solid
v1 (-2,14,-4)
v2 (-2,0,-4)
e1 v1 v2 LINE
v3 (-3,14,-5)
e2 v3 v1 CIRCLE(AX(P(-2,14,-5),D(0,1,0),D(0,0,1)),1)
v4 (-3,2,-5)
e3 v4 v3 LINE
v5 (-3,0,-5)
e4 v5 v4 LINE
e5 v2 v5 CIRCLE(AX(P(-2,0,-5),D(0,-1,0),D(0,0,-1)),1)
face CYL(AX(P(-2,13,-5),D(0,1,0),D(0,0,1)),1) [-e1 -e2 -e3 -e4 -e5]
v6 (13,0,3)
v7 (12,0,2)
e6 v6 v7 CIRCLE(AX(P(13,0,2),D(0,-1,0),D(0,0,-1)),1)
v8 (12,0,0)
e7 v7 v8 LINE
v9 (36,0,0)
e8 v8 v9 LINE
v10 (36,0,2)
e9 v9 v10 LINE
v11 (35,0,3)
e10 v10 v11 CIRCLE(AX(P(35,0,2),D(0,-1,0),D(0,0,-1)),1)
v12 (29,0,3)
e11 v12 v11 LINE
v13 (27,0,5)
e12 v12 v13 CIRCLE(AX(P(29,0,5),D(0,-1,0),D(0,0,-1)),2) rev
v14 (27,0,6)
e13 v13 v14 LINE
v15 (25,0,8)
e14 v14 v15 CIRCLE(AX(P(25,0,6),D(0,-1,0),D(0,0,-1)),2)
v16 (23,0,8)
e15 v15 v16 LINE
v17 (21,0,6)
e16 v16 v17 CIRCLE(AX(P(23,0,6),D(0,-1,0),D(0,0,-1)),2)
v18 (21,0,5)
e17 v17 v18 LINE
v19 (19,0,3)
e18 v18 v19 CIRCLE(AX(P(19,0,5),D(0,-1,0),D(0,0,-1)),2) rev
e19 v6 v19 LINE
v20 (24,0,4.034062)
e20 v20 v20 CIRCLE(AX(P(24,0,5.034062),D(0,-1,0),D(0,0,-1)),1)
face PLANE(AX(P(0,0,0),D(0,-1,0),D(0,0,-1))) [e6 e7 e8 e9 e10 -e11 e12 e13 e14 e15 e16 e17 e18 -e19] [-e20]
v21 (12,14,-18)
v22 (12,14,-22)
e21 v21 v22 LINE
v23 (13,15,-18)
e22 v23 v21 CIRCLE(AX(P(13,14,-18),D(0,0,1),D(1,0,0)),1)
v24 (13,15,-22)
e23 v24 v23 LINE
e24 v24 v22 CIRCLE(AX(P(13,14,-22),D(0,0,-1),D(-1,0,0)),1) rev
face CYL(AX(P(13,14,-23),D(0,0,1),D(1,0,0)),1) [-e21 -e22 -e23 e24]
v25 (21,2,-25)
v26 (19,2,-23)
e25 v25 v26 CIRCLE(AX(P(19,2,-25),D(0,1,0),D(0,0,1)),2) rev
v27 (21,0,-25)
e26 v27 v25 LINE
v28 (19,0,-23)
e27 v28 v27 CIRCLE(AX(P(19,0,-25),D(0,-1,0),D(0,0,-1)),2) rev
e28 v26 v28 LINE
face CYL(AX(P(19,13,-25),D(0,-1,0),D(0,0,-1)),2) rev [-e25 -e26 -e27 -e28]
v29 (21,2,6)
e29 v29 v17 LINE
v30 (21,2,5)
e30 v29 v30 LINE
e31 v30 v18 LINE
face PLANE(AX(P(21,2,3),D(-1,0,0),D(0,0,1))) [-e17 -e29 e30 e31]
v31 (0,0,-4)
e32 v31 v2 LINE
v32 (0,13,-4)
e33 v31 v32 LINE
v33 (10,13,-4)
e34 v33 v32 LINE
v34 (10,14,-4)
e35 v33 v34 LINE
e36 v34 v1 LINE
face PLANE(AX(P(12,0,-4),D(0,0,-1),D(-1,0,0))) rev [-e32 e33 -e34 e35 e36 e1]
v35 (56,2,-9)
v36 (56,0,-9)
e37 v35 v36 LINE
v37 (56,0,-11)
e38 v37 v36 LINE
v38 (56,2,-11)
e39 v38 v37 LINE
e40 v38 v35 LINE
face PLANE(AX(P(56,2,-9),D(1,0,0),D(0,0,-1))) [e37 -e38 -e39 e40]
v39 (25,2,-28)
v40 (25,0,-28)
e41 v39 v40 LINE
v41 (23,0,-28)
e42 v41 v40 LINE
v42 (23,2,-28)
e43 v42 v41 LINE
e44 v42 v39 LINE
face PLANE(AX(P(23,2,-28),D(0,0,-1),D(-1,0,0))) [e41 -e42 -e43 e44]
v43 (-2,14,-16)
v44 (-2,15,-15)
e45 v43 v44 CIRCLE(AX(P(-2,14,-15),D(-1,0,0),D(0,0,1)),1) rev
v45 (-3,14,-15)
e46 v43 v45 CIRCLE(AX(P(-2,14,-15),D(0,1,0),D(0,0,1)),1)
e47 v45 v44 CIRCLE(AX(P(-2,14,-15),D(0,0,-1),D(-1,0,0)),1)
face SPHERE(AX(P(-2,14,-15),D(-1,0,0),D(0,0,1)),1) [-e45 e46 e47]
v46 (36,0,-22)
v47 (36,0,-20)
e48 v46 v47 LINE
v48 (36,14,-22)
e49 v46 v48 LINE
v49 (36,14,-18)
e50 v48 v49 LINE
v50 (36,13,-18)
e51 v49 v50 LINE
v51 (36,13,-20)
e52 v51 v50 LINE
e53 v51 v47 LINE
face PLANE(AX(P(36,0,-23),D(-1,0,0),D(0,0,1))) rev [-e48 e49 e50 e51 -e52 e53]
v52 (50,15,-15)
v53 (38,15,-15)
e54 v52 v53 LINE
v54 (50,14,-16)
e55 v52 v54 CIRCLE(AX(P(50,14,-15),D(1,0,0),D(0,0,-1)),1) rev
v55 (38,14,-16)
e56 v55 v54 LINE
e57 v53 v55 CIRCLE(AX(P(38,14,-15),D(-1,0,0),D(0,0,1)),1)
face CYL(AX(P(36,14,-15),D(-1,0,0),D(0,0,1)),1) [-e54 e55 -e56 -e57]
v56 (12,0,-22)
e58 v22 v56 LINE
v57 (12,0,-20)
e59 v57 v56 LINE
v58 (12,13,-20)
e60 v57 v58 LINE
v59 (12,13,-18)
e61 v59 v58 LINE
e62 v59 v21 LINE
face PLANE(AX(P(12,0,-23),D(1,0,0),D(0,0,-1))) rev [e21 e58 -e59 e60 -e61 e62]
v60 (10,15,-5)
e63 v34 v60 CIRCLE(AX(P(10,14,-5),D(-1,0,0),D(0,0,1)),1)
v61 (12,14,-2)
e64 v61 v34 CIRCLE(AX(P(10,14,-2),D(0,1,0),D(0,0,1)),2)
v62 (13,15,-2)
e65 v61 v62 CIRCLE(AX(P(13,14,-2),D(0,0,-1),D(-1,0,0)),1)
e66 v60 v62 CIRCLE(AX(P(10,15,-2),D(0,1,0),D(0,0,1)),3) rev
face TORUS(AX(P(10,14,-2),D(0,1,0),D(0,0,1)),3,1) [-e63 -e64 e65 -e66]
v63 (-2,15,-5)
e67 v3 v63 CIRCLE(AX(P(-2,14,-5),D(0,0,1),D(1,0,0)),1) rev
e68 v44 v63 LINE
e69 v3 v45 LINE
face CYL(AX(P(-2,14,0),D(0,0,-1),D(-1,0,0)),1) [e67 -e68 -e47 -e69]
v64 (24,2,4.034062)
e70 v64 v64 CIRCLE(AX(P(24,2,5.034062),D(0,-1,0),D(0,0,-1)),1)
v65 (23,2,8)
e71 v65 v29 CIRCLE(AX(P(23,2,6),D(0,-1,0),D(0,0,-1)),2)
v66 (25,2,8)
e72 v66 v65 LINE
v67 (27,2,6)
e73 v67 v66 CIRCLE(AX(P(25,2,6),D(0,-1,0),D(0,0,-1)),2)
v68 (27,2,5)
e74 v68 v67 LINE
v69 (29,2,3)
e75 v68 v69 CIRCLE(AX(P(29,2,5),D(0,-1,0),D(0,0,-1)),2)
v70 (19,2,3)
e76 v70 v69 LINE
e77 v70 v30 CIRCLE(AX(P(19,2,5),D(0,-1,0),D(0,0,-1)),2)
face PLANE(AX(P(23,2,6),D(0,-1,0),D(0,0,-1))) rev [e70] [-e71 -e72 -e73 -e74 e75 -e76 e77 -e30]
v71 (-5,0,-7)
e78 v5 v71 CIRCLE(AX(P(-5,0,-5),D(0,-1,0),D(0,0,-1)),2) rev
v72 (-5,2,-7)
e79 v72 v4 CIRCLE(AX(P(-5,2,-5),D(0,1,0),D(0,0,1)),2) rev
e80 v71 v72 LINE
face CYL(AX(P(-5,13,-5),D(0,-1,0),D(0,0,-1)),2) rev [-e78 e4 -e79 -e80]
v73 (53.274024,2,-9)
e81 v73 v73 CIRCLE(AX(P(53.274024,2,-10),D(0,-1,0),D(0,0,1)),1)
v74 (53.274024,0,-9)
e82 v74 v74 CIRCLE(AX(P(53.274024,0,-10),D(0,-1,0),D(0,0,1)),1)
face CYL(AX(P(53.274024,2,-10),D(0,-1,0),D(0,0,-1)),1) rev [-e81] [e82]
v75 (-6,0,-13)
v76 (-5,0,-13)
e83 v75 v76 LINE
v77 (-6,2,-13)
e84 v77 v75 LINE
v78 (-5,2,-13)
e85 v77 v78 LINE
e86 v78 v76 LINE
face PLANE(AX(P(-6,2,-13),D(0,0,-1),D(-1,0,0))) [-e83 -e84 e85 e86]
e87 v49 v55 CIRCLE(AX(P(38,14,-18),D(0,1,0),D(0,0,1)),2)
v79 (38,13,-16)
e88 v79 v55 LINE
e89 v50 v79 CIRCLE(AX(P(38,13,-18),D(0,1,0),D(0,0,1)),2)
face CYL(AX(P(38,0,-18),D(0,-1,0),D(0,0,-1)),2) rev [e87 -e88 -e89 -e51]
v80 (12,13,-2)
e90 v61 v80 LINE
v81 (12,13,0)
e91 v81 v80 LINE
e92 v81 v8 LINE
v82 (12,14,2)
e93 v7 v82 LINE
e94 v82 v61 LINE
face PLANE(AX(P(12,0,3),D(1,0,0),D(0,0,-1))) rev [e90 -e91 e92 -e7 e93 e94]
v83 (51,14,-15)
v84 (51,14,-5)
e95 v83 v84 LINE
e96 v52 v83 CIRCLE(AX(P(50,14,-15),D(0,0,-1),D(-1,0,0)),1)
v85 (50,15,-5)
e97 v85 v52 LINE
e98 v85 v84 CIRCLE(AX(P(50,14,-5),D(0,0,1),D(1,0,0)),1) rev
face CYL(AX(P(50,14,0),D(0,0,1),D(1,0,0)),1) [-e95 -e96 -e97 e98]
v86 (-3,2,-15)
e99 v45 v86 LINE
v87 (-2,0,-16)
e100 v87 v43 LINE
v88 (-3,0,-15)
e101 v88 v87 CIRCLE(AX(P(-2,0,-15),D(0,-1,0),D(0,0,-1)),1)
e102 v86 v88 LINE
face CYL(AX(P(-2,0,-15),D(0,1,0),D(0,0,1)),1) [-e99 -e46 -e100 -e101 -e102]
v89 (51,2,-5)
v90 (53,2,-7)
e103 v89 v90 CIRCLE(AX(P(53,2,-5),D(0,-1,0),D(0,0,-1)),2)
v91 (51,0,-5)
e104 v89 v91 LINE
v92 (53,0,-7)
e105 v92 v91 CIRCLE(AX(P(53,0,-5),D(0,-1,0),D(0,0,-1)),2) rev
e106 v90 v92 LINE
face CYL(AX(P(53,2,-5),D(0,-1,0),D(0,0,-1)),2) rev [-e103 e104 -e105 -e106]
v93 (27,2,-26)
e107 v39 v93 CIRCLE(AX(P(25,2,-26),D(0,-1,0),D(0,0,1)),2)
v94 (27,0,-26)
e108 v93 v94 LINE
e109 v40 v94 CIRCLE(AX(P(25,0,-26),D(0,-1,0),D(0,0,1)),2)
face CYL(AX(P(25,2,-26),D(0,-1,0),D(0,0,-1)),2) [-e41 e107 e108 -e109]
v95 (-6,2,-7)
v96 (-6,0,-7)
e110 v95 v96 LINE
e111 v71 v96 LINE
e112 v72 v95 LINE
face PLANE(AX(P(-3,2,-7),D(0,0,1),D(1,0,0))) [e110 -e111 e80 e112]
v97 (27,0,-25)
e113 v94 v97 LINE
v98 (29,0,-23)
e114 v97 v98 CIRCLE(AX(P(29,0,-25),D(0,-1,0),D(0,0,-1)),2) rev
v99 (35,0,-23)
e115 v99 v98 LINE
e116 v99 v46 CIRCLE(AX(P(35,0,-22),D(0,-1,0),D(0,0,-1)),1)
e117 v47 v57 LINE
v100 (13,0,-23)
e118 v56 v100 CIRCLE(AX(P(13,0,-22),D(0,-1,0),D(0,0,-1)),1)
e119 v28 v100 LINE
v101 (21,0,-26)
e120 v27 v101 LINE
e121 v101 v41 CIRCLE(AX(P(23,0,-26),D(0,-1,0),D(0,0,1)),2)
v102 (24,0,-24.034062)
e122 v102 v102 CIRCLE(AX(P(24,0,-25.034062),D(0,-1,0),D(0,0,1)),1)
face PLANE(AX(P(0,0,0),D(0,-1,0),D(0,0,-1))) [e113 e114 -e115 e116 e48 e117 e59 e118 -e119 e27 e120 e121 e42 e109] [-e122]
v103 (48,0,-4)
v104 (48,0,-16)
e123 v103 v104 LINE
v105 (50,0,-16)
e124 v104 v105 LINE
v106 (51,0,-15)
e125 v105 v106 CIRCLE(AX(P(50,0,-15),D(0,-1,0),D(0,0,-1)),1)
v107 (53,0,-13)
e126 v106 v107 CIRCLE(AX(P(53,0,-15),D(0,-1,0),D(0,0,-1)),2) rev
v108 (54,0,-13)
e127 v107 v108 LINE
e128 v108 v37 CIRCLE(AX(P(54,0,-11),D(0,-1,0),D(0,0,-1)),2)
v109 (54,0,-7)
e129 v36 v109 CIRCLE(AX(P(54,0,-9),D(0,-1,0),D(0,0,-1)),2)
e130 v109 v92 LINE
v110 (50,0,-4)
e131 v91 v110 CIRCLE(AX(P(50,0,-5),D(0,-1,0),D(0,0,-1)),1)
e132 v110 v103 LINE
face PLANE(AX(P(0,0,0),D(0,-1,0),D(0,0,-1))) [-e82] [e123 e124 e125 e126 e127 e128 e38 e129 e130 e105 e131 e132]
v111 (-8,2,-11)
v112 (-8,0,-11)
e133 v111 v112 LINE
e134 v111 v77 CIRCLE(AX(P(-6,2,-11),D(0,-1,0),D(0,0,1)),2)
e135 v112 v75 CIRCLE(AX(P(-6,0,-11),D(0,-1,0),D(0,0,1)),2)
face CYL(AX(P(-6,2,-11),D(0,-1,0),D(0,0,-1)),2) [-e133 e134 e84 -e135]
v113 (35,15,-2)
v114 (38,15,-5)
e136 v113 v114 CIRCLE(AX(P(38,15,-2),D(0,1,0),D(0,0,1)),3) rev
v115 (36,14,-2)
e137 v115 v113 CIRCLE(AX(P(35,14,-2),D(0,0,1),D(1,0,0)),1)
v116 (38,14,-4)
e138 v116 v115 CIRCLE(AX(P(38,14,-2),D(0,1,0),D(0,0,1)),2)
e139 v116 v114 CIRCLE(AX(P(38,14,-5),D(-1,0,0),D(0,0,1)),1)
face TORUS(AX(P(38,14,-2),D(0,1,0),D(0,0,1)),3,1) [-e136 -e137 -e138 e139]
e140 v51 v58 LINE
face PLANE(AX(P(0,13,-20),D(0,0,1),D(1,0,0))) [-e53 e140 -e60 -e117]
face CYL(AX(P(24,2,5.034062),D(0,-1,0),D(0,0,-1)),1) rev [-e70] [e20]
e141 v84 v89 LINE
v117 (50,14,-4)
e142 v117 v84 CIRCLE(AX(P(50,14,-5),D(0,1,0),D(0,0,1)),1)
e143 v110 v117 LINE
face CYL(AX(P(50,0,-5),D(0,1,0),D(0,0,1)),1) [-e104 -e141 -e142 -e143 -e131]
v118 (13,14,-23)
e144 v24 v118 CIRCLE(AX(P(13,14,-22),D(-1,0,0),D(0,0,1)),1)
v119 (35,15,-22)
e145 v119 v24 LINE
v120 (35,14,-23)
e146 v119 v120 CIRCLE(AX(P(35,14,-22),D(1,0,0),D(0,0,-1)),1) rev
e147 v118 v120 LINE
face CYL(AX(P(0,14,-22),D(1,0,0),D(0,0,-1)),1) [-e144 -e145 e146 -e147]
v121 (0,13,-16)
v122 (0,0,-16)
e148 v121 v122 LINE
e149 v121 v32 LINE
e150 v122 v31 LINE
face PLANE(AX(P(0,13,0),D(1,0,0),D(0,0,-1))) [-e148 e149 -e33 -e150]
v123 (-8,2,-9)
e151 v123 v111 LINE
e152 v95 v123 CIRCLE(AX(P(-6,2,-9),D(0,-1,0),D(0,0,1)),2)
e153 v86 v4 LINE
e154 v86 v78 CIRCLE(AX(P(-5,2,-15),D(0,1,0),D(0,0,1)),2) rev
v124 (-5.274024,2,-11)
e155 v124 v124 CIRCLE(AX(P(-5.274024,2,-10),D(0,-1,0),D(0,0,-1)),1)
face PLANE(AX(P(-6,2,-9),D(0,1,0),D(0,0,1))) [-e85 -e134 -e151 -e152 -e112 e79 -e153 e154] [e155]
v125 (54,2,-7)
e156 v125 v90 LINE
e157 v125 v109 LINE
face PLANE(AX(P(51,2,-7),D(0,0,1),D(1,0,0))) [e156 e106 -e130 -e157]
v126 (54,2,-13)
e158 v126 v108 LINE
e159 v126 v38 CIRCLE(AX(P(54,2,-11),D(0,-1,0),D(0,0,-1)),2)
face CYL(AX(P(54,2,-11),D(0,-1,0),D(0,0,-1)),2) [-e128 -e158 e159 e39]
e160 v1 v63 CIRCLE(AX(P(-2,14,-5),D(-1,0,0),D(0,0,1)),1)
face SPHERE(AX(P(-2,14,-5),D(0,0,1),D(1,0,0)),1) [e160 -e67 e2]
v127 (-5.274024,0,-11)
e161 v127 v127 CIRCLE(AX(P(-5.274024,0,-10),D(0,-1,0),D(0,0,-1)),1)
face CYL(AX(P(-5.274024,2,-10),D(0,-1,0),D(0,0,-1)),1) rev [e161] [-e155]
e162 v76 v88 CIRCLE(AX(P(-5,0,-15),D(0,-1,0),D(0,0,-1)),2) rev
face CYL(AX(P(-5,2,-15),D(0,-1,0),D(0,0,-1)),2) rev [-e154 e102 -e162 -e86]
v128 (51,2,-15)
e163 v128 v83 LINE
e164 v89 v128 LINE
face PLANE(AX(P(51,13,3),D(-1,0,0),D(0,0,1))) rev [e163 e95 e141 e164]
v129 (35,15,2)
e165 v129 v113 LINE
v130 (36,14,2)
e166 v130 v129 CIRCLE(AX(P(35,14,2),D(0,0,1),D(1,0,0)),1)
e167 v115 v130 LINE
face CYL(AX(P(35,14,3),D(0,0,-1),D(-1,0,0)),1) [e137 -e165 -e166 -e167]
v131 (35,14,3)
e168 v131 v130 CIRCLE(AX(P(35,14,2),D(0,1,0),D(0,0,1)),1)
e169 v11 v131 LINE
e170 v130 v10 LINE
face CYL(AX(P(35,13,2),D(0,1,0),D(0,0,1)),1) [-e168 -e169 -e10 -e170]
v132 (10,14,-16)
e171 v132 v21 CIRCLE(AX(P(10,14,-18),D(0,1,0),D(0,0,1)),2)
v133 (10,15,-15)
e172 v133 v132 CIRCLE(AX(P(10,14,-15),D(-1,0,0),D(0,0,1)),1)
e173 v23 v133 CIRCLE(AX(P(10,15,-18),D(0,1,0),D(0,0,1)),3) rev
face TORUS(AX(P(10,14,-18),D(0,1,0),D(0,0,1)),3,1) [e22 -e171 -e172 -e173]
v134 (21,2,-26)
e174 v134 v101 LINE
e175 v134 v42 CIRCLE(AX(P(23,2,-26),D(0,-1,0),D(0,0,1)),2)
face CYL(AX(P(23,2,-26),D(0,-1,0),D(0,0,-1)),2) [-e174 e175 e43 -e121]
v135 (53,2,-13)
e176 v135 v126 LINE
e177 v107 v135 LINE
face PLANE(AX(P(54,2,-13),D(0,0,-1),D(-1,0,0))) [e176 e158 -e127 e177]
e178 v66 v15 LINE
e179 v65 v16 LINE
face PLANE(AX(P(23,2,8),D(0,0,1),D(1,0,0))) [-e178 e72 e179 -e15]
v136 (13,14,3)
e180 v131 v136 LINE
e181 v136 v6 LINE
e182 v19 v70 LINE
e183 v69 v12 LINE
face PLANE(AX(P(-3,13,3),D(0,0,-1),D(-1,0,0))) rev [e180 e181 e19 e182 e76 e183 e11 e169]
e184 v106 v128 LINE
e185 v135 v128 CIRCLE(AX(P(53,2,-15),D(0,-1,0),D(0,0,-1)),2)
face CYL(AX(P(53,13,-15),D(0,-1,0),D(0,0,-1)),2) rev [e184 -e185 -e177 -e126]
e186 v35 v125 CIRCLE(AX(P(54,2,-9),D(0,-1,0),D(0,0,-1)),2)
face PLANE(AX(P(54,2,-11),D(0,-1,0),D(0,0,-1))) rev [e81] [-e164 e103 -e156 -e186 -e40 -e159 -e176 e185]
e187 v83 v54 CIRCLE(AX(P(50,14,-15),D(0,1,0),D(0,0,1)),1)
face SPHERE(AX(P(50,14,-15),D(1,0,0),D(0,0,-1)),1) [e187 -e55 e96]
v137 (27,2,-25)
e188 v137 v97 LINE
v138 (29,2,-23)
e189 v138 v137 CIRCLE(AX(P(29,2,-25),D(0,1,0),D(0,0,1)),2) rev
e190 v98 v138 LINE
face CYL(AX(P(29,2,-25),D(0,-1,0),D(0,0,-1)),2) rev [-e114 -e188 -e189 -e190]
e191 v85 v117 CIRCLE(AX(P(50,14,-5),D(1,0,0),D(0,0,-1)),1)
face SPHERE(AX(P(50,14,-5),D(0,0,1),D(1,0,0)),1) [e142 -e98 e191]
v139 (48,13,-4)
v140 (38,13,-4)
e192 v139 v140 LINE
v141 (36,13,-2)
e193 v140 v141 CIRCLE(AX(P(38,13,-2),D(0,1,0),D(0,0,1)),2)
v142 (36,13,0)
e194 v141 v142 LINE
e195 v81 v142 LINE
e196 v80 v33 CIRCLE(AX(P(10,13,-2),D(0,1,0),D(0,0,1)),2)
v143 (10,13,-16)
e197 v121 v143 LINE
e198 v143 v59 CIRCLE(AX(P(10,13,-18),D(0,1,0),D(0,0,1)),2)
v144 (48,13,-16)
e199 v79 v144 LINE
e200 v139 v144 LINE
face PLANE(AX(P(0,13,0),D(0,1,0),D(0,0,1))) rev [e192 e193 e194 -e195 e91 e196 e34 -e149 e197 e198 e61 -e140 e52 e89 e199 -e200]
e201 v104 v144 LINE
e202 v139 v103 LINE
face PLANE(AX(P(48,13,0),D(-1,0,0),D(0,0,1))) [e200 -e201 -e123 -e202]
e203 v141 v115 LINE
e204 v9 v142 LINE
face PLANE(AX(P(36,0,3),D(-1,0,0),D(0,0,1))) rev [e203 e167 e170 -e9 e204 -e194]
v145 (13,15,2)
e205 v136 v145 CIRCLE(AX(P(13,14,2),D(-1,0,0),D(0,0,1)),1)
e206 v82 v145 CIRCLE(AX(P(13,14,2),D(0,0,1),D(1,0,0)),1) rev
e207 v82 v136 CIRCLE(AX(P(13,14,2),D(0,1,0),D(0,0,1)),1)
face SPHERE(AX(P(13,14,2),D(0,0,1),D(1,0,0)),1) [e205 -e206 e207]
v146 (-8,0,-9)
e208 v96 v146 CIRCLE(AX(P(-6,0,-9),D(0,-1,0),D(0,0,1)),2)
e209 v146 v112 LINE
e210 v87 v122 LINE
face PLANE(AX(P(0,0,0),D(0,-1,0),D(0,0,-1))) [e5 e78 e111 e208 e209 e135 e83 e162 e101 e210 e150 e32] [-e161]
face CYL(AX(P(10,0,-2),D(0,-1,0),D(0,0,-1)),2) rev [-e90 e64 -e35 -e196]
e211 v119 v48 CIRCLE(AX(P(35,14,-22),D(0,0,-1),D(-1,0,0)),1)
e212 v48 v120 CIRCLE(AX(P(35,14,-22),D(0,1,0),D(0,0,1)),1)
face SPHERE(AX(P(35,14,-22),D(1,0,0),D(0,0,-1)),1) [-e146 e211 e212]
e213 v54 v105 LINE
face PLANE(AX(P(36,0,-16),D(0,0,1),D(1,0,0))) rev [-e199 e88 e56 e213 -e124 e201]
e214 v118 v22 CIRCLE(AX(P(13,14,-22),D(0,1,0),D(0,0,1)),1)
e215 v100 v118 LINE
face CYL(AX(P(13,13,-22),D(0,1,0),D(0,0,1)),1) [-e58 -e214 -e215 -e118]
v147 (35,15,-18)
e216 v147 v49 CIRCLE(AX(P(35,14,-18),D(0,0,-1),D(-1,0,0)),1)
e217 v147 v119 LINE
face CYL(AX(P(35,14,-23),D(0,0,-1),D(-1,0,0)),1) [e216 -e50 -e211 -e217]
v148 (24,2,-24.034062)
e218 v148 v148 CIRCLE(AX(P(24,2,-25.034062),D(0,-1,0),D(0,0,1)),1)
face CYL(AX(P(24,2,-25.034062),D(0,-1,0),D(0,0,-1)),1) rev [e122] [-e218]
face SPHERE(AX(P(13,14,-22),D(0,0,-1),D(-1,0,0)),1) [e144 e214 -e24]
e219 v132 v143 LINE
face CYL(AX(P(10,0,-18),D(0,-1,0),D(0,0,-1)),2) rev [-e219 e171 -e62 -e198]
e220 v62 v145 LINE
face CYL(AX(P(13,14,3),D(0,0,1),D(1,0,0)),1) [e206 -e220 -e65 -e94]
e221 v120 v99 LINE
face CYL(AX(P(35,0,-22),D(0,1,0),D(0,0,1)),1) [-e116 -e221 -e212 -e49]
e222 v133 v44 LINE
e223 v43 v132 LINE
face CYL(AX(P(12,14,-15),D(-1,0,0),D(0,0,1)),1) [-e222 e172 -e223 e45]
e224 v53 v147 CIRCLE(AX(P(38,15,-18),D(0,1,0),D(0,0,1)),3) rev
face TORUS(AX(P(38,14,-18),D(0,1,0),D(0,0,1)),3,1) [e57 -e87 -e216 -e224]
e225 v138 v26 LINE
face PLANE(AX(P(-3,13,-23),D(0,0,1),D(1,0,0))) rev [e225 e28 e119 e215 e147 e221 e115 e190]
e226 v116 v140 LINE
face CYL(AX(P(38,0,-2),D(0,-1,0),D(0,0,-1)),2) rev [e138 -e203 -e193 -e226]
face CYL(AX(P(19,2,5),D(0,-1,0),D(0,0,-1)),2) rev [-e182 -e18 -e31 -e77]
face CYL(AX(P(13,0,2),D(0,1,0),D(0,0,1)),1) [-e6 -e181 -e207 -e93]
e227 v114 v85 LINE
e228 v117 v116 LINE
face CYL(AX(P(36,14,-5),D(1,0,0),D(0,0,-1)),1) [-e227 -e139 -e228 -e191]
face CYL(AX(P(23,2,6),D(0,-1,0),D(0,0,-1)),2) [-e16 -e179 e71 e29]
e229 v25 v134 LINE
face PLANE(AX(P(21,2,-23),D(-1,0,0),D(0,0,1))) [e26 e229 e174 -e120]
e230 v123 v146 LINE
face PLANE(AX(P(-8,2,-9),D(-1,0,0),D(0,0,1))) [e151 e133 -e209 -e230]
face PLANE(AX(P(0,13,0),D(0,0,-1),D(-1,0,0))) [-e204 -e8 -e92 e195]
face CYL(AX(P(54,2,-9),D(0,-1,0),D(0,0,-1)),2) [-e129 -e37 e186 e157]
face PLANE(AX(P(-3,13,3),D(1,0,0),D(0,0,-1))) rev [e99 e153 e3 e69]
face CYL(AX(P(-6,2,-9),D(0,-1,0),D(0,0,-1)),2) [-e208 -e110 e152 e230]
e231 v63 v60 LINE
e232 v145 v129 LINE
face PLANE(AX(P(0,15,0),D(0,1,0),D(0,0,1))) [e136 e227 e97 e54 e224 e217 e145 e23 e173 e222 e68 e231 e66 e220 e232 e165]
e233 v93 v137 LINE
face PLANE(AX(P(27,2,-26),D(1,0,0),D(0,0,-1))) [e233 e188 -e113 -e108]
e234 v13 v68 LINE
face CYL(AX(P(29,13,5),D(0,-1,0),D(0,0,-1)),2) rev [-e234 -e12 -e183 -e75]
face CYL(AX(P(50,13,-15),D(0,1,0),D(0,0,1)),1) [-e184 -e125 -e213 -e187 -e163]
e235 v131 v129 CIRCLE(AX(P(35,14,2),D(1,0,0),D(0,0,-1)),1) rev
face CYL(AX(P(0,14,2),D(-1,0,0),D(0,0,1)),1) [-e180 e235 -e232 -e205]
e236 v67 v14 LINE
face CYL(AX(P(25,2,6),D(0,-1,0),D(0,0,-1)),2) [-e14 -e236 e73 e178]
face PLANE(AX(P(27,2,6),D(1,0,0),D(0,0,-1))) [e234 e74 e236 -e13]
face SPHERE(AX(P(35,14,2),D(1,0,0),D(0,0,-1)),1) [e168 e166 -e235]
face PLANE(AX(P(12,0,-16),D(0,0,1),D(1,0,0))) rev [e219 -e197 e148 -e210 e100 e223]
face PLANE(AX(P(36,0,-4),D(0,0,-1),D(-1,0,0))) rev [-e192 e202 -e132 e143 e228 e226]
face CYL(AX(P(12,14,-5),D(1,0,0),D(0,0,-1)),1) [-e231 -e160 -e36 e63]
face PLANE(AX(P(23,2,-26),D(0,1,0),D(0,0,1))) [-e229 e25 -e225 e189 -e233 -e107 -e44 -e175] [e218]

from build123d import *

# Parameters (mm, degrees)
SKETCH1_W           = 54
SKETCH1_H           = 26
SKETCH1_W_2         = 48
SKETCH1_H_2         = 20
BOSS_EXTRUDE1_DEPTH = 13
SKETCH2_W           = 54
SKETCH2_H           = 26
BOSS_EXTRUDE2_DEPTH = 2
SKETCH3_W           = 15
SKETCH3_H           = 7
CUT_EXTRUDE1_DEPTH  = 58.92236183
FILLET1_R           = 2
FILLET2_R           = 1
SKETCH4_R           = 1
BOSS_EXTRUDE3_DEPTH = 2
FILLET3_R           = 2


with BuildPart() as part:
    # Sketch1 → Boss-Extrude1 (new body)
    with BuildSketch(Plane(origin=(0, 0, 0), x_dir=(1, 0, 0), z_dir=(0, 1, 0))):
        with Locations((24, 10)):
            Rectangle(SKETCH1_W, SKETCH1_H)
        with Locations((24, 10)):
            Rectangle(SKETCH1_W_2, SKETCH1_H_2, mode=Mode.SUBTRACT)
    extrude(amount=BOSS_EXTRUDE1_DEPTH)

    # Sketch2 → Boss-Extrude2 (add)
    with BuildSketch(Plane(origin=(0, 13, 0), x_dir=(1, 0, 0), z_dir=(0, 1, 0))):
        with Locations((24, 10)):
            Rectangle(SKETCH2_W, SKETCH2_H)
    extrude(amount=BOSS_EXTRUDE2_DEPTH)

    # Sketch3 → Cut-Extrude1 (cut, through all)
    with BuildSketch(Plane(origin=(0, 15, 0), x_dir=(1, 0, 0), z_dir=(0, 1, 0))):
        with Locations((4.5, 19.5)):
            Rectangle(SKETCH3_W, SKETCH3_H)
        with Locations((4.5, 0.5)):
            Rectangle(SKETCH3_W, SKETCH3_H)
        with Locations((43.5, 0.5)):
            Rectangle(SKETCH3_W, SKETCH3_H)
        with Locations((43.5, 19.5)):
            Rectangle(SKETCH3_W, SKETCH3_H)
    extrude(amount=-CUT_EXTRUDE1_DEPTH, mode=Mode.SUBTRACT)

    # Fillet1
    fillet1_edges = [part.edges().sort_by_distance(p)[0] for p in [
        (12, 14, -16),
        (36, 14, -16),
        (36, 14, -4),
        (12, 14, -4),
    ]]
    fillet(fillet1_edges, radius=FILLET1_R)

    # Fillet2
    fillet2_edges = [part.edges().sort_by_distance(p)[0] for p in [
        (-3, 7.5, -16),
        (12, 7.5, -23),
        (3.5, 15, -16),
        (36, 15, 0.5),
        (3.5, 15, -4),
        (12, 15, -20.5),
        (44.5, 15, -16),
        (36.585786438, 15, -3.414213562),
        (11.414213562, 15, -3.414213562),
        (11.414213562, 15, -16.585786438),
        (36.585786438, 15, -16.585786438),
        (-3, 15, -10),
        (24, 15, 3),
        (51, 15, -10),
        (24, 15, -23),
        (51, 7.5, -16),
        (36, 7.5, -23),
        (36, 15, -20.5),
        (51, 7.5, -4),
        (36, 7.5, 3),
        (44.5, 15, -4),
        (-3, 7.5, -4),
        (12, 7.5, 3),
        (12, 15, 0.5),
    ]]
    fillet(fillet2_edges, radius=FILLET2_R)

    # Sketch4 → Boss-Extrude3 (add)
    # profile 1 of 4: a face of its own
    with BuildSketch(Plane.XZ):
        with BuildLine():
            Line((24, 3), (21, 3))
            Line((21, 3), (21, 6))
            ThreePointArc((21, 6), (21.585786438, 7.414213562), (23, 8))
            Line((23, 8), (25, 8))
            ThreePointArc((25, 8), (26.414213562, 7.414213562), (27, 6))
            Line((27, 6), (27, 3))
            Line((27, 3), (24, 3))
        make_face()
        with Locations(Location((24, 5.034061628, 0), (0, 0, 270))):
            Circle(SKETCH4_R, mode=Mode.SUBTRACT)
    # profile 2 of 4: a face of its own
    with BuildSketch(Plane.XZ):
        with BuildLine():
            Line((27, -23), (24, -23))
            Line((24, -23), (21, -23))
            Line((21, -23), (21, -26))
            ThreePointArc((21, -26), (21.585786438, -27.414213562), (23, -28))
            Line((23, -28), (25, -28))
            ThreePointArc((25, -28), (26.414213562, -27.414213562), (27, -26))
            Line((27, -26), (27, -23))
        make_face()
        with Locations(Location((24, -25.034061628, 0), (0, 0, 90))):
            Circle(SKETCH4_R, mode=Mode.SUBTRACT)
    # profile 3 of 4: a face of its own
    with BuildSketch(Plane.XZ):
        with BuildLine():
            Line((-3, -10), (-3, -7))
            Line((-3, -7), (-6, -7))
            ThreePointArc((-6, -7), (-7.414213562, -7.585786438), (-8, -9))
            Line((-8, -9), (-8, -11))
            ThreePointArc((-8, -11), (-7.414213562, -12.414213562), (-6, -13))
            Line((-6, -13), (-3, -13))
            Line((-3, -13), (-3, -10))
        make_face()
        with Locations(Location((-5.274023851, -10, 0), (0, 0, 270))):
            Circle(SKETCH4_R, mode=Mode.SUBTRACT)
    # profile 4 of 4: a face of its own
    with BuildSketch(Plane.XZ):
        with BuildLine():
            Line((51, -13), (51, -10))
            Line((51, -10), (51, -7))
            Line((51, -7), (54, -7))
            ThreePointArc((54, -7), (55.414213562, -7.585786438), (56, -9))
            Line((56, -9), (56, -11))
            ThreePointArc((56, -11), (55.414213562, -12.414213562), (54, -13))
            Line((54, -13), (51, -13))
        make_face()
        with Locations(Location((53.274023851, -10, 0), (0, 0, 90))):
            Circle(SKETCH4_R, mode=Mode.SUBTRACT)
    extrude(amount=-BOSS_EXTRUDE3_DEPTH)

    # Fillet3
    fillet3_edges = [part.edges().sort_by_distance(p)[0] for p in [
        (27, 1, 3),
        (21, 1, 3),
        (51, 1, -7),
        (51, 1, -13),
        (27, 1, -23),
        (21, 1, -23),
        (-3, 1, -13),
        (-3, 1, -7),
    ]]
    fillet(fillet3_edges, radius=FILLET3_R - 0.0001)  # a hair under: the kernel refuses the full size


solid = part.part
